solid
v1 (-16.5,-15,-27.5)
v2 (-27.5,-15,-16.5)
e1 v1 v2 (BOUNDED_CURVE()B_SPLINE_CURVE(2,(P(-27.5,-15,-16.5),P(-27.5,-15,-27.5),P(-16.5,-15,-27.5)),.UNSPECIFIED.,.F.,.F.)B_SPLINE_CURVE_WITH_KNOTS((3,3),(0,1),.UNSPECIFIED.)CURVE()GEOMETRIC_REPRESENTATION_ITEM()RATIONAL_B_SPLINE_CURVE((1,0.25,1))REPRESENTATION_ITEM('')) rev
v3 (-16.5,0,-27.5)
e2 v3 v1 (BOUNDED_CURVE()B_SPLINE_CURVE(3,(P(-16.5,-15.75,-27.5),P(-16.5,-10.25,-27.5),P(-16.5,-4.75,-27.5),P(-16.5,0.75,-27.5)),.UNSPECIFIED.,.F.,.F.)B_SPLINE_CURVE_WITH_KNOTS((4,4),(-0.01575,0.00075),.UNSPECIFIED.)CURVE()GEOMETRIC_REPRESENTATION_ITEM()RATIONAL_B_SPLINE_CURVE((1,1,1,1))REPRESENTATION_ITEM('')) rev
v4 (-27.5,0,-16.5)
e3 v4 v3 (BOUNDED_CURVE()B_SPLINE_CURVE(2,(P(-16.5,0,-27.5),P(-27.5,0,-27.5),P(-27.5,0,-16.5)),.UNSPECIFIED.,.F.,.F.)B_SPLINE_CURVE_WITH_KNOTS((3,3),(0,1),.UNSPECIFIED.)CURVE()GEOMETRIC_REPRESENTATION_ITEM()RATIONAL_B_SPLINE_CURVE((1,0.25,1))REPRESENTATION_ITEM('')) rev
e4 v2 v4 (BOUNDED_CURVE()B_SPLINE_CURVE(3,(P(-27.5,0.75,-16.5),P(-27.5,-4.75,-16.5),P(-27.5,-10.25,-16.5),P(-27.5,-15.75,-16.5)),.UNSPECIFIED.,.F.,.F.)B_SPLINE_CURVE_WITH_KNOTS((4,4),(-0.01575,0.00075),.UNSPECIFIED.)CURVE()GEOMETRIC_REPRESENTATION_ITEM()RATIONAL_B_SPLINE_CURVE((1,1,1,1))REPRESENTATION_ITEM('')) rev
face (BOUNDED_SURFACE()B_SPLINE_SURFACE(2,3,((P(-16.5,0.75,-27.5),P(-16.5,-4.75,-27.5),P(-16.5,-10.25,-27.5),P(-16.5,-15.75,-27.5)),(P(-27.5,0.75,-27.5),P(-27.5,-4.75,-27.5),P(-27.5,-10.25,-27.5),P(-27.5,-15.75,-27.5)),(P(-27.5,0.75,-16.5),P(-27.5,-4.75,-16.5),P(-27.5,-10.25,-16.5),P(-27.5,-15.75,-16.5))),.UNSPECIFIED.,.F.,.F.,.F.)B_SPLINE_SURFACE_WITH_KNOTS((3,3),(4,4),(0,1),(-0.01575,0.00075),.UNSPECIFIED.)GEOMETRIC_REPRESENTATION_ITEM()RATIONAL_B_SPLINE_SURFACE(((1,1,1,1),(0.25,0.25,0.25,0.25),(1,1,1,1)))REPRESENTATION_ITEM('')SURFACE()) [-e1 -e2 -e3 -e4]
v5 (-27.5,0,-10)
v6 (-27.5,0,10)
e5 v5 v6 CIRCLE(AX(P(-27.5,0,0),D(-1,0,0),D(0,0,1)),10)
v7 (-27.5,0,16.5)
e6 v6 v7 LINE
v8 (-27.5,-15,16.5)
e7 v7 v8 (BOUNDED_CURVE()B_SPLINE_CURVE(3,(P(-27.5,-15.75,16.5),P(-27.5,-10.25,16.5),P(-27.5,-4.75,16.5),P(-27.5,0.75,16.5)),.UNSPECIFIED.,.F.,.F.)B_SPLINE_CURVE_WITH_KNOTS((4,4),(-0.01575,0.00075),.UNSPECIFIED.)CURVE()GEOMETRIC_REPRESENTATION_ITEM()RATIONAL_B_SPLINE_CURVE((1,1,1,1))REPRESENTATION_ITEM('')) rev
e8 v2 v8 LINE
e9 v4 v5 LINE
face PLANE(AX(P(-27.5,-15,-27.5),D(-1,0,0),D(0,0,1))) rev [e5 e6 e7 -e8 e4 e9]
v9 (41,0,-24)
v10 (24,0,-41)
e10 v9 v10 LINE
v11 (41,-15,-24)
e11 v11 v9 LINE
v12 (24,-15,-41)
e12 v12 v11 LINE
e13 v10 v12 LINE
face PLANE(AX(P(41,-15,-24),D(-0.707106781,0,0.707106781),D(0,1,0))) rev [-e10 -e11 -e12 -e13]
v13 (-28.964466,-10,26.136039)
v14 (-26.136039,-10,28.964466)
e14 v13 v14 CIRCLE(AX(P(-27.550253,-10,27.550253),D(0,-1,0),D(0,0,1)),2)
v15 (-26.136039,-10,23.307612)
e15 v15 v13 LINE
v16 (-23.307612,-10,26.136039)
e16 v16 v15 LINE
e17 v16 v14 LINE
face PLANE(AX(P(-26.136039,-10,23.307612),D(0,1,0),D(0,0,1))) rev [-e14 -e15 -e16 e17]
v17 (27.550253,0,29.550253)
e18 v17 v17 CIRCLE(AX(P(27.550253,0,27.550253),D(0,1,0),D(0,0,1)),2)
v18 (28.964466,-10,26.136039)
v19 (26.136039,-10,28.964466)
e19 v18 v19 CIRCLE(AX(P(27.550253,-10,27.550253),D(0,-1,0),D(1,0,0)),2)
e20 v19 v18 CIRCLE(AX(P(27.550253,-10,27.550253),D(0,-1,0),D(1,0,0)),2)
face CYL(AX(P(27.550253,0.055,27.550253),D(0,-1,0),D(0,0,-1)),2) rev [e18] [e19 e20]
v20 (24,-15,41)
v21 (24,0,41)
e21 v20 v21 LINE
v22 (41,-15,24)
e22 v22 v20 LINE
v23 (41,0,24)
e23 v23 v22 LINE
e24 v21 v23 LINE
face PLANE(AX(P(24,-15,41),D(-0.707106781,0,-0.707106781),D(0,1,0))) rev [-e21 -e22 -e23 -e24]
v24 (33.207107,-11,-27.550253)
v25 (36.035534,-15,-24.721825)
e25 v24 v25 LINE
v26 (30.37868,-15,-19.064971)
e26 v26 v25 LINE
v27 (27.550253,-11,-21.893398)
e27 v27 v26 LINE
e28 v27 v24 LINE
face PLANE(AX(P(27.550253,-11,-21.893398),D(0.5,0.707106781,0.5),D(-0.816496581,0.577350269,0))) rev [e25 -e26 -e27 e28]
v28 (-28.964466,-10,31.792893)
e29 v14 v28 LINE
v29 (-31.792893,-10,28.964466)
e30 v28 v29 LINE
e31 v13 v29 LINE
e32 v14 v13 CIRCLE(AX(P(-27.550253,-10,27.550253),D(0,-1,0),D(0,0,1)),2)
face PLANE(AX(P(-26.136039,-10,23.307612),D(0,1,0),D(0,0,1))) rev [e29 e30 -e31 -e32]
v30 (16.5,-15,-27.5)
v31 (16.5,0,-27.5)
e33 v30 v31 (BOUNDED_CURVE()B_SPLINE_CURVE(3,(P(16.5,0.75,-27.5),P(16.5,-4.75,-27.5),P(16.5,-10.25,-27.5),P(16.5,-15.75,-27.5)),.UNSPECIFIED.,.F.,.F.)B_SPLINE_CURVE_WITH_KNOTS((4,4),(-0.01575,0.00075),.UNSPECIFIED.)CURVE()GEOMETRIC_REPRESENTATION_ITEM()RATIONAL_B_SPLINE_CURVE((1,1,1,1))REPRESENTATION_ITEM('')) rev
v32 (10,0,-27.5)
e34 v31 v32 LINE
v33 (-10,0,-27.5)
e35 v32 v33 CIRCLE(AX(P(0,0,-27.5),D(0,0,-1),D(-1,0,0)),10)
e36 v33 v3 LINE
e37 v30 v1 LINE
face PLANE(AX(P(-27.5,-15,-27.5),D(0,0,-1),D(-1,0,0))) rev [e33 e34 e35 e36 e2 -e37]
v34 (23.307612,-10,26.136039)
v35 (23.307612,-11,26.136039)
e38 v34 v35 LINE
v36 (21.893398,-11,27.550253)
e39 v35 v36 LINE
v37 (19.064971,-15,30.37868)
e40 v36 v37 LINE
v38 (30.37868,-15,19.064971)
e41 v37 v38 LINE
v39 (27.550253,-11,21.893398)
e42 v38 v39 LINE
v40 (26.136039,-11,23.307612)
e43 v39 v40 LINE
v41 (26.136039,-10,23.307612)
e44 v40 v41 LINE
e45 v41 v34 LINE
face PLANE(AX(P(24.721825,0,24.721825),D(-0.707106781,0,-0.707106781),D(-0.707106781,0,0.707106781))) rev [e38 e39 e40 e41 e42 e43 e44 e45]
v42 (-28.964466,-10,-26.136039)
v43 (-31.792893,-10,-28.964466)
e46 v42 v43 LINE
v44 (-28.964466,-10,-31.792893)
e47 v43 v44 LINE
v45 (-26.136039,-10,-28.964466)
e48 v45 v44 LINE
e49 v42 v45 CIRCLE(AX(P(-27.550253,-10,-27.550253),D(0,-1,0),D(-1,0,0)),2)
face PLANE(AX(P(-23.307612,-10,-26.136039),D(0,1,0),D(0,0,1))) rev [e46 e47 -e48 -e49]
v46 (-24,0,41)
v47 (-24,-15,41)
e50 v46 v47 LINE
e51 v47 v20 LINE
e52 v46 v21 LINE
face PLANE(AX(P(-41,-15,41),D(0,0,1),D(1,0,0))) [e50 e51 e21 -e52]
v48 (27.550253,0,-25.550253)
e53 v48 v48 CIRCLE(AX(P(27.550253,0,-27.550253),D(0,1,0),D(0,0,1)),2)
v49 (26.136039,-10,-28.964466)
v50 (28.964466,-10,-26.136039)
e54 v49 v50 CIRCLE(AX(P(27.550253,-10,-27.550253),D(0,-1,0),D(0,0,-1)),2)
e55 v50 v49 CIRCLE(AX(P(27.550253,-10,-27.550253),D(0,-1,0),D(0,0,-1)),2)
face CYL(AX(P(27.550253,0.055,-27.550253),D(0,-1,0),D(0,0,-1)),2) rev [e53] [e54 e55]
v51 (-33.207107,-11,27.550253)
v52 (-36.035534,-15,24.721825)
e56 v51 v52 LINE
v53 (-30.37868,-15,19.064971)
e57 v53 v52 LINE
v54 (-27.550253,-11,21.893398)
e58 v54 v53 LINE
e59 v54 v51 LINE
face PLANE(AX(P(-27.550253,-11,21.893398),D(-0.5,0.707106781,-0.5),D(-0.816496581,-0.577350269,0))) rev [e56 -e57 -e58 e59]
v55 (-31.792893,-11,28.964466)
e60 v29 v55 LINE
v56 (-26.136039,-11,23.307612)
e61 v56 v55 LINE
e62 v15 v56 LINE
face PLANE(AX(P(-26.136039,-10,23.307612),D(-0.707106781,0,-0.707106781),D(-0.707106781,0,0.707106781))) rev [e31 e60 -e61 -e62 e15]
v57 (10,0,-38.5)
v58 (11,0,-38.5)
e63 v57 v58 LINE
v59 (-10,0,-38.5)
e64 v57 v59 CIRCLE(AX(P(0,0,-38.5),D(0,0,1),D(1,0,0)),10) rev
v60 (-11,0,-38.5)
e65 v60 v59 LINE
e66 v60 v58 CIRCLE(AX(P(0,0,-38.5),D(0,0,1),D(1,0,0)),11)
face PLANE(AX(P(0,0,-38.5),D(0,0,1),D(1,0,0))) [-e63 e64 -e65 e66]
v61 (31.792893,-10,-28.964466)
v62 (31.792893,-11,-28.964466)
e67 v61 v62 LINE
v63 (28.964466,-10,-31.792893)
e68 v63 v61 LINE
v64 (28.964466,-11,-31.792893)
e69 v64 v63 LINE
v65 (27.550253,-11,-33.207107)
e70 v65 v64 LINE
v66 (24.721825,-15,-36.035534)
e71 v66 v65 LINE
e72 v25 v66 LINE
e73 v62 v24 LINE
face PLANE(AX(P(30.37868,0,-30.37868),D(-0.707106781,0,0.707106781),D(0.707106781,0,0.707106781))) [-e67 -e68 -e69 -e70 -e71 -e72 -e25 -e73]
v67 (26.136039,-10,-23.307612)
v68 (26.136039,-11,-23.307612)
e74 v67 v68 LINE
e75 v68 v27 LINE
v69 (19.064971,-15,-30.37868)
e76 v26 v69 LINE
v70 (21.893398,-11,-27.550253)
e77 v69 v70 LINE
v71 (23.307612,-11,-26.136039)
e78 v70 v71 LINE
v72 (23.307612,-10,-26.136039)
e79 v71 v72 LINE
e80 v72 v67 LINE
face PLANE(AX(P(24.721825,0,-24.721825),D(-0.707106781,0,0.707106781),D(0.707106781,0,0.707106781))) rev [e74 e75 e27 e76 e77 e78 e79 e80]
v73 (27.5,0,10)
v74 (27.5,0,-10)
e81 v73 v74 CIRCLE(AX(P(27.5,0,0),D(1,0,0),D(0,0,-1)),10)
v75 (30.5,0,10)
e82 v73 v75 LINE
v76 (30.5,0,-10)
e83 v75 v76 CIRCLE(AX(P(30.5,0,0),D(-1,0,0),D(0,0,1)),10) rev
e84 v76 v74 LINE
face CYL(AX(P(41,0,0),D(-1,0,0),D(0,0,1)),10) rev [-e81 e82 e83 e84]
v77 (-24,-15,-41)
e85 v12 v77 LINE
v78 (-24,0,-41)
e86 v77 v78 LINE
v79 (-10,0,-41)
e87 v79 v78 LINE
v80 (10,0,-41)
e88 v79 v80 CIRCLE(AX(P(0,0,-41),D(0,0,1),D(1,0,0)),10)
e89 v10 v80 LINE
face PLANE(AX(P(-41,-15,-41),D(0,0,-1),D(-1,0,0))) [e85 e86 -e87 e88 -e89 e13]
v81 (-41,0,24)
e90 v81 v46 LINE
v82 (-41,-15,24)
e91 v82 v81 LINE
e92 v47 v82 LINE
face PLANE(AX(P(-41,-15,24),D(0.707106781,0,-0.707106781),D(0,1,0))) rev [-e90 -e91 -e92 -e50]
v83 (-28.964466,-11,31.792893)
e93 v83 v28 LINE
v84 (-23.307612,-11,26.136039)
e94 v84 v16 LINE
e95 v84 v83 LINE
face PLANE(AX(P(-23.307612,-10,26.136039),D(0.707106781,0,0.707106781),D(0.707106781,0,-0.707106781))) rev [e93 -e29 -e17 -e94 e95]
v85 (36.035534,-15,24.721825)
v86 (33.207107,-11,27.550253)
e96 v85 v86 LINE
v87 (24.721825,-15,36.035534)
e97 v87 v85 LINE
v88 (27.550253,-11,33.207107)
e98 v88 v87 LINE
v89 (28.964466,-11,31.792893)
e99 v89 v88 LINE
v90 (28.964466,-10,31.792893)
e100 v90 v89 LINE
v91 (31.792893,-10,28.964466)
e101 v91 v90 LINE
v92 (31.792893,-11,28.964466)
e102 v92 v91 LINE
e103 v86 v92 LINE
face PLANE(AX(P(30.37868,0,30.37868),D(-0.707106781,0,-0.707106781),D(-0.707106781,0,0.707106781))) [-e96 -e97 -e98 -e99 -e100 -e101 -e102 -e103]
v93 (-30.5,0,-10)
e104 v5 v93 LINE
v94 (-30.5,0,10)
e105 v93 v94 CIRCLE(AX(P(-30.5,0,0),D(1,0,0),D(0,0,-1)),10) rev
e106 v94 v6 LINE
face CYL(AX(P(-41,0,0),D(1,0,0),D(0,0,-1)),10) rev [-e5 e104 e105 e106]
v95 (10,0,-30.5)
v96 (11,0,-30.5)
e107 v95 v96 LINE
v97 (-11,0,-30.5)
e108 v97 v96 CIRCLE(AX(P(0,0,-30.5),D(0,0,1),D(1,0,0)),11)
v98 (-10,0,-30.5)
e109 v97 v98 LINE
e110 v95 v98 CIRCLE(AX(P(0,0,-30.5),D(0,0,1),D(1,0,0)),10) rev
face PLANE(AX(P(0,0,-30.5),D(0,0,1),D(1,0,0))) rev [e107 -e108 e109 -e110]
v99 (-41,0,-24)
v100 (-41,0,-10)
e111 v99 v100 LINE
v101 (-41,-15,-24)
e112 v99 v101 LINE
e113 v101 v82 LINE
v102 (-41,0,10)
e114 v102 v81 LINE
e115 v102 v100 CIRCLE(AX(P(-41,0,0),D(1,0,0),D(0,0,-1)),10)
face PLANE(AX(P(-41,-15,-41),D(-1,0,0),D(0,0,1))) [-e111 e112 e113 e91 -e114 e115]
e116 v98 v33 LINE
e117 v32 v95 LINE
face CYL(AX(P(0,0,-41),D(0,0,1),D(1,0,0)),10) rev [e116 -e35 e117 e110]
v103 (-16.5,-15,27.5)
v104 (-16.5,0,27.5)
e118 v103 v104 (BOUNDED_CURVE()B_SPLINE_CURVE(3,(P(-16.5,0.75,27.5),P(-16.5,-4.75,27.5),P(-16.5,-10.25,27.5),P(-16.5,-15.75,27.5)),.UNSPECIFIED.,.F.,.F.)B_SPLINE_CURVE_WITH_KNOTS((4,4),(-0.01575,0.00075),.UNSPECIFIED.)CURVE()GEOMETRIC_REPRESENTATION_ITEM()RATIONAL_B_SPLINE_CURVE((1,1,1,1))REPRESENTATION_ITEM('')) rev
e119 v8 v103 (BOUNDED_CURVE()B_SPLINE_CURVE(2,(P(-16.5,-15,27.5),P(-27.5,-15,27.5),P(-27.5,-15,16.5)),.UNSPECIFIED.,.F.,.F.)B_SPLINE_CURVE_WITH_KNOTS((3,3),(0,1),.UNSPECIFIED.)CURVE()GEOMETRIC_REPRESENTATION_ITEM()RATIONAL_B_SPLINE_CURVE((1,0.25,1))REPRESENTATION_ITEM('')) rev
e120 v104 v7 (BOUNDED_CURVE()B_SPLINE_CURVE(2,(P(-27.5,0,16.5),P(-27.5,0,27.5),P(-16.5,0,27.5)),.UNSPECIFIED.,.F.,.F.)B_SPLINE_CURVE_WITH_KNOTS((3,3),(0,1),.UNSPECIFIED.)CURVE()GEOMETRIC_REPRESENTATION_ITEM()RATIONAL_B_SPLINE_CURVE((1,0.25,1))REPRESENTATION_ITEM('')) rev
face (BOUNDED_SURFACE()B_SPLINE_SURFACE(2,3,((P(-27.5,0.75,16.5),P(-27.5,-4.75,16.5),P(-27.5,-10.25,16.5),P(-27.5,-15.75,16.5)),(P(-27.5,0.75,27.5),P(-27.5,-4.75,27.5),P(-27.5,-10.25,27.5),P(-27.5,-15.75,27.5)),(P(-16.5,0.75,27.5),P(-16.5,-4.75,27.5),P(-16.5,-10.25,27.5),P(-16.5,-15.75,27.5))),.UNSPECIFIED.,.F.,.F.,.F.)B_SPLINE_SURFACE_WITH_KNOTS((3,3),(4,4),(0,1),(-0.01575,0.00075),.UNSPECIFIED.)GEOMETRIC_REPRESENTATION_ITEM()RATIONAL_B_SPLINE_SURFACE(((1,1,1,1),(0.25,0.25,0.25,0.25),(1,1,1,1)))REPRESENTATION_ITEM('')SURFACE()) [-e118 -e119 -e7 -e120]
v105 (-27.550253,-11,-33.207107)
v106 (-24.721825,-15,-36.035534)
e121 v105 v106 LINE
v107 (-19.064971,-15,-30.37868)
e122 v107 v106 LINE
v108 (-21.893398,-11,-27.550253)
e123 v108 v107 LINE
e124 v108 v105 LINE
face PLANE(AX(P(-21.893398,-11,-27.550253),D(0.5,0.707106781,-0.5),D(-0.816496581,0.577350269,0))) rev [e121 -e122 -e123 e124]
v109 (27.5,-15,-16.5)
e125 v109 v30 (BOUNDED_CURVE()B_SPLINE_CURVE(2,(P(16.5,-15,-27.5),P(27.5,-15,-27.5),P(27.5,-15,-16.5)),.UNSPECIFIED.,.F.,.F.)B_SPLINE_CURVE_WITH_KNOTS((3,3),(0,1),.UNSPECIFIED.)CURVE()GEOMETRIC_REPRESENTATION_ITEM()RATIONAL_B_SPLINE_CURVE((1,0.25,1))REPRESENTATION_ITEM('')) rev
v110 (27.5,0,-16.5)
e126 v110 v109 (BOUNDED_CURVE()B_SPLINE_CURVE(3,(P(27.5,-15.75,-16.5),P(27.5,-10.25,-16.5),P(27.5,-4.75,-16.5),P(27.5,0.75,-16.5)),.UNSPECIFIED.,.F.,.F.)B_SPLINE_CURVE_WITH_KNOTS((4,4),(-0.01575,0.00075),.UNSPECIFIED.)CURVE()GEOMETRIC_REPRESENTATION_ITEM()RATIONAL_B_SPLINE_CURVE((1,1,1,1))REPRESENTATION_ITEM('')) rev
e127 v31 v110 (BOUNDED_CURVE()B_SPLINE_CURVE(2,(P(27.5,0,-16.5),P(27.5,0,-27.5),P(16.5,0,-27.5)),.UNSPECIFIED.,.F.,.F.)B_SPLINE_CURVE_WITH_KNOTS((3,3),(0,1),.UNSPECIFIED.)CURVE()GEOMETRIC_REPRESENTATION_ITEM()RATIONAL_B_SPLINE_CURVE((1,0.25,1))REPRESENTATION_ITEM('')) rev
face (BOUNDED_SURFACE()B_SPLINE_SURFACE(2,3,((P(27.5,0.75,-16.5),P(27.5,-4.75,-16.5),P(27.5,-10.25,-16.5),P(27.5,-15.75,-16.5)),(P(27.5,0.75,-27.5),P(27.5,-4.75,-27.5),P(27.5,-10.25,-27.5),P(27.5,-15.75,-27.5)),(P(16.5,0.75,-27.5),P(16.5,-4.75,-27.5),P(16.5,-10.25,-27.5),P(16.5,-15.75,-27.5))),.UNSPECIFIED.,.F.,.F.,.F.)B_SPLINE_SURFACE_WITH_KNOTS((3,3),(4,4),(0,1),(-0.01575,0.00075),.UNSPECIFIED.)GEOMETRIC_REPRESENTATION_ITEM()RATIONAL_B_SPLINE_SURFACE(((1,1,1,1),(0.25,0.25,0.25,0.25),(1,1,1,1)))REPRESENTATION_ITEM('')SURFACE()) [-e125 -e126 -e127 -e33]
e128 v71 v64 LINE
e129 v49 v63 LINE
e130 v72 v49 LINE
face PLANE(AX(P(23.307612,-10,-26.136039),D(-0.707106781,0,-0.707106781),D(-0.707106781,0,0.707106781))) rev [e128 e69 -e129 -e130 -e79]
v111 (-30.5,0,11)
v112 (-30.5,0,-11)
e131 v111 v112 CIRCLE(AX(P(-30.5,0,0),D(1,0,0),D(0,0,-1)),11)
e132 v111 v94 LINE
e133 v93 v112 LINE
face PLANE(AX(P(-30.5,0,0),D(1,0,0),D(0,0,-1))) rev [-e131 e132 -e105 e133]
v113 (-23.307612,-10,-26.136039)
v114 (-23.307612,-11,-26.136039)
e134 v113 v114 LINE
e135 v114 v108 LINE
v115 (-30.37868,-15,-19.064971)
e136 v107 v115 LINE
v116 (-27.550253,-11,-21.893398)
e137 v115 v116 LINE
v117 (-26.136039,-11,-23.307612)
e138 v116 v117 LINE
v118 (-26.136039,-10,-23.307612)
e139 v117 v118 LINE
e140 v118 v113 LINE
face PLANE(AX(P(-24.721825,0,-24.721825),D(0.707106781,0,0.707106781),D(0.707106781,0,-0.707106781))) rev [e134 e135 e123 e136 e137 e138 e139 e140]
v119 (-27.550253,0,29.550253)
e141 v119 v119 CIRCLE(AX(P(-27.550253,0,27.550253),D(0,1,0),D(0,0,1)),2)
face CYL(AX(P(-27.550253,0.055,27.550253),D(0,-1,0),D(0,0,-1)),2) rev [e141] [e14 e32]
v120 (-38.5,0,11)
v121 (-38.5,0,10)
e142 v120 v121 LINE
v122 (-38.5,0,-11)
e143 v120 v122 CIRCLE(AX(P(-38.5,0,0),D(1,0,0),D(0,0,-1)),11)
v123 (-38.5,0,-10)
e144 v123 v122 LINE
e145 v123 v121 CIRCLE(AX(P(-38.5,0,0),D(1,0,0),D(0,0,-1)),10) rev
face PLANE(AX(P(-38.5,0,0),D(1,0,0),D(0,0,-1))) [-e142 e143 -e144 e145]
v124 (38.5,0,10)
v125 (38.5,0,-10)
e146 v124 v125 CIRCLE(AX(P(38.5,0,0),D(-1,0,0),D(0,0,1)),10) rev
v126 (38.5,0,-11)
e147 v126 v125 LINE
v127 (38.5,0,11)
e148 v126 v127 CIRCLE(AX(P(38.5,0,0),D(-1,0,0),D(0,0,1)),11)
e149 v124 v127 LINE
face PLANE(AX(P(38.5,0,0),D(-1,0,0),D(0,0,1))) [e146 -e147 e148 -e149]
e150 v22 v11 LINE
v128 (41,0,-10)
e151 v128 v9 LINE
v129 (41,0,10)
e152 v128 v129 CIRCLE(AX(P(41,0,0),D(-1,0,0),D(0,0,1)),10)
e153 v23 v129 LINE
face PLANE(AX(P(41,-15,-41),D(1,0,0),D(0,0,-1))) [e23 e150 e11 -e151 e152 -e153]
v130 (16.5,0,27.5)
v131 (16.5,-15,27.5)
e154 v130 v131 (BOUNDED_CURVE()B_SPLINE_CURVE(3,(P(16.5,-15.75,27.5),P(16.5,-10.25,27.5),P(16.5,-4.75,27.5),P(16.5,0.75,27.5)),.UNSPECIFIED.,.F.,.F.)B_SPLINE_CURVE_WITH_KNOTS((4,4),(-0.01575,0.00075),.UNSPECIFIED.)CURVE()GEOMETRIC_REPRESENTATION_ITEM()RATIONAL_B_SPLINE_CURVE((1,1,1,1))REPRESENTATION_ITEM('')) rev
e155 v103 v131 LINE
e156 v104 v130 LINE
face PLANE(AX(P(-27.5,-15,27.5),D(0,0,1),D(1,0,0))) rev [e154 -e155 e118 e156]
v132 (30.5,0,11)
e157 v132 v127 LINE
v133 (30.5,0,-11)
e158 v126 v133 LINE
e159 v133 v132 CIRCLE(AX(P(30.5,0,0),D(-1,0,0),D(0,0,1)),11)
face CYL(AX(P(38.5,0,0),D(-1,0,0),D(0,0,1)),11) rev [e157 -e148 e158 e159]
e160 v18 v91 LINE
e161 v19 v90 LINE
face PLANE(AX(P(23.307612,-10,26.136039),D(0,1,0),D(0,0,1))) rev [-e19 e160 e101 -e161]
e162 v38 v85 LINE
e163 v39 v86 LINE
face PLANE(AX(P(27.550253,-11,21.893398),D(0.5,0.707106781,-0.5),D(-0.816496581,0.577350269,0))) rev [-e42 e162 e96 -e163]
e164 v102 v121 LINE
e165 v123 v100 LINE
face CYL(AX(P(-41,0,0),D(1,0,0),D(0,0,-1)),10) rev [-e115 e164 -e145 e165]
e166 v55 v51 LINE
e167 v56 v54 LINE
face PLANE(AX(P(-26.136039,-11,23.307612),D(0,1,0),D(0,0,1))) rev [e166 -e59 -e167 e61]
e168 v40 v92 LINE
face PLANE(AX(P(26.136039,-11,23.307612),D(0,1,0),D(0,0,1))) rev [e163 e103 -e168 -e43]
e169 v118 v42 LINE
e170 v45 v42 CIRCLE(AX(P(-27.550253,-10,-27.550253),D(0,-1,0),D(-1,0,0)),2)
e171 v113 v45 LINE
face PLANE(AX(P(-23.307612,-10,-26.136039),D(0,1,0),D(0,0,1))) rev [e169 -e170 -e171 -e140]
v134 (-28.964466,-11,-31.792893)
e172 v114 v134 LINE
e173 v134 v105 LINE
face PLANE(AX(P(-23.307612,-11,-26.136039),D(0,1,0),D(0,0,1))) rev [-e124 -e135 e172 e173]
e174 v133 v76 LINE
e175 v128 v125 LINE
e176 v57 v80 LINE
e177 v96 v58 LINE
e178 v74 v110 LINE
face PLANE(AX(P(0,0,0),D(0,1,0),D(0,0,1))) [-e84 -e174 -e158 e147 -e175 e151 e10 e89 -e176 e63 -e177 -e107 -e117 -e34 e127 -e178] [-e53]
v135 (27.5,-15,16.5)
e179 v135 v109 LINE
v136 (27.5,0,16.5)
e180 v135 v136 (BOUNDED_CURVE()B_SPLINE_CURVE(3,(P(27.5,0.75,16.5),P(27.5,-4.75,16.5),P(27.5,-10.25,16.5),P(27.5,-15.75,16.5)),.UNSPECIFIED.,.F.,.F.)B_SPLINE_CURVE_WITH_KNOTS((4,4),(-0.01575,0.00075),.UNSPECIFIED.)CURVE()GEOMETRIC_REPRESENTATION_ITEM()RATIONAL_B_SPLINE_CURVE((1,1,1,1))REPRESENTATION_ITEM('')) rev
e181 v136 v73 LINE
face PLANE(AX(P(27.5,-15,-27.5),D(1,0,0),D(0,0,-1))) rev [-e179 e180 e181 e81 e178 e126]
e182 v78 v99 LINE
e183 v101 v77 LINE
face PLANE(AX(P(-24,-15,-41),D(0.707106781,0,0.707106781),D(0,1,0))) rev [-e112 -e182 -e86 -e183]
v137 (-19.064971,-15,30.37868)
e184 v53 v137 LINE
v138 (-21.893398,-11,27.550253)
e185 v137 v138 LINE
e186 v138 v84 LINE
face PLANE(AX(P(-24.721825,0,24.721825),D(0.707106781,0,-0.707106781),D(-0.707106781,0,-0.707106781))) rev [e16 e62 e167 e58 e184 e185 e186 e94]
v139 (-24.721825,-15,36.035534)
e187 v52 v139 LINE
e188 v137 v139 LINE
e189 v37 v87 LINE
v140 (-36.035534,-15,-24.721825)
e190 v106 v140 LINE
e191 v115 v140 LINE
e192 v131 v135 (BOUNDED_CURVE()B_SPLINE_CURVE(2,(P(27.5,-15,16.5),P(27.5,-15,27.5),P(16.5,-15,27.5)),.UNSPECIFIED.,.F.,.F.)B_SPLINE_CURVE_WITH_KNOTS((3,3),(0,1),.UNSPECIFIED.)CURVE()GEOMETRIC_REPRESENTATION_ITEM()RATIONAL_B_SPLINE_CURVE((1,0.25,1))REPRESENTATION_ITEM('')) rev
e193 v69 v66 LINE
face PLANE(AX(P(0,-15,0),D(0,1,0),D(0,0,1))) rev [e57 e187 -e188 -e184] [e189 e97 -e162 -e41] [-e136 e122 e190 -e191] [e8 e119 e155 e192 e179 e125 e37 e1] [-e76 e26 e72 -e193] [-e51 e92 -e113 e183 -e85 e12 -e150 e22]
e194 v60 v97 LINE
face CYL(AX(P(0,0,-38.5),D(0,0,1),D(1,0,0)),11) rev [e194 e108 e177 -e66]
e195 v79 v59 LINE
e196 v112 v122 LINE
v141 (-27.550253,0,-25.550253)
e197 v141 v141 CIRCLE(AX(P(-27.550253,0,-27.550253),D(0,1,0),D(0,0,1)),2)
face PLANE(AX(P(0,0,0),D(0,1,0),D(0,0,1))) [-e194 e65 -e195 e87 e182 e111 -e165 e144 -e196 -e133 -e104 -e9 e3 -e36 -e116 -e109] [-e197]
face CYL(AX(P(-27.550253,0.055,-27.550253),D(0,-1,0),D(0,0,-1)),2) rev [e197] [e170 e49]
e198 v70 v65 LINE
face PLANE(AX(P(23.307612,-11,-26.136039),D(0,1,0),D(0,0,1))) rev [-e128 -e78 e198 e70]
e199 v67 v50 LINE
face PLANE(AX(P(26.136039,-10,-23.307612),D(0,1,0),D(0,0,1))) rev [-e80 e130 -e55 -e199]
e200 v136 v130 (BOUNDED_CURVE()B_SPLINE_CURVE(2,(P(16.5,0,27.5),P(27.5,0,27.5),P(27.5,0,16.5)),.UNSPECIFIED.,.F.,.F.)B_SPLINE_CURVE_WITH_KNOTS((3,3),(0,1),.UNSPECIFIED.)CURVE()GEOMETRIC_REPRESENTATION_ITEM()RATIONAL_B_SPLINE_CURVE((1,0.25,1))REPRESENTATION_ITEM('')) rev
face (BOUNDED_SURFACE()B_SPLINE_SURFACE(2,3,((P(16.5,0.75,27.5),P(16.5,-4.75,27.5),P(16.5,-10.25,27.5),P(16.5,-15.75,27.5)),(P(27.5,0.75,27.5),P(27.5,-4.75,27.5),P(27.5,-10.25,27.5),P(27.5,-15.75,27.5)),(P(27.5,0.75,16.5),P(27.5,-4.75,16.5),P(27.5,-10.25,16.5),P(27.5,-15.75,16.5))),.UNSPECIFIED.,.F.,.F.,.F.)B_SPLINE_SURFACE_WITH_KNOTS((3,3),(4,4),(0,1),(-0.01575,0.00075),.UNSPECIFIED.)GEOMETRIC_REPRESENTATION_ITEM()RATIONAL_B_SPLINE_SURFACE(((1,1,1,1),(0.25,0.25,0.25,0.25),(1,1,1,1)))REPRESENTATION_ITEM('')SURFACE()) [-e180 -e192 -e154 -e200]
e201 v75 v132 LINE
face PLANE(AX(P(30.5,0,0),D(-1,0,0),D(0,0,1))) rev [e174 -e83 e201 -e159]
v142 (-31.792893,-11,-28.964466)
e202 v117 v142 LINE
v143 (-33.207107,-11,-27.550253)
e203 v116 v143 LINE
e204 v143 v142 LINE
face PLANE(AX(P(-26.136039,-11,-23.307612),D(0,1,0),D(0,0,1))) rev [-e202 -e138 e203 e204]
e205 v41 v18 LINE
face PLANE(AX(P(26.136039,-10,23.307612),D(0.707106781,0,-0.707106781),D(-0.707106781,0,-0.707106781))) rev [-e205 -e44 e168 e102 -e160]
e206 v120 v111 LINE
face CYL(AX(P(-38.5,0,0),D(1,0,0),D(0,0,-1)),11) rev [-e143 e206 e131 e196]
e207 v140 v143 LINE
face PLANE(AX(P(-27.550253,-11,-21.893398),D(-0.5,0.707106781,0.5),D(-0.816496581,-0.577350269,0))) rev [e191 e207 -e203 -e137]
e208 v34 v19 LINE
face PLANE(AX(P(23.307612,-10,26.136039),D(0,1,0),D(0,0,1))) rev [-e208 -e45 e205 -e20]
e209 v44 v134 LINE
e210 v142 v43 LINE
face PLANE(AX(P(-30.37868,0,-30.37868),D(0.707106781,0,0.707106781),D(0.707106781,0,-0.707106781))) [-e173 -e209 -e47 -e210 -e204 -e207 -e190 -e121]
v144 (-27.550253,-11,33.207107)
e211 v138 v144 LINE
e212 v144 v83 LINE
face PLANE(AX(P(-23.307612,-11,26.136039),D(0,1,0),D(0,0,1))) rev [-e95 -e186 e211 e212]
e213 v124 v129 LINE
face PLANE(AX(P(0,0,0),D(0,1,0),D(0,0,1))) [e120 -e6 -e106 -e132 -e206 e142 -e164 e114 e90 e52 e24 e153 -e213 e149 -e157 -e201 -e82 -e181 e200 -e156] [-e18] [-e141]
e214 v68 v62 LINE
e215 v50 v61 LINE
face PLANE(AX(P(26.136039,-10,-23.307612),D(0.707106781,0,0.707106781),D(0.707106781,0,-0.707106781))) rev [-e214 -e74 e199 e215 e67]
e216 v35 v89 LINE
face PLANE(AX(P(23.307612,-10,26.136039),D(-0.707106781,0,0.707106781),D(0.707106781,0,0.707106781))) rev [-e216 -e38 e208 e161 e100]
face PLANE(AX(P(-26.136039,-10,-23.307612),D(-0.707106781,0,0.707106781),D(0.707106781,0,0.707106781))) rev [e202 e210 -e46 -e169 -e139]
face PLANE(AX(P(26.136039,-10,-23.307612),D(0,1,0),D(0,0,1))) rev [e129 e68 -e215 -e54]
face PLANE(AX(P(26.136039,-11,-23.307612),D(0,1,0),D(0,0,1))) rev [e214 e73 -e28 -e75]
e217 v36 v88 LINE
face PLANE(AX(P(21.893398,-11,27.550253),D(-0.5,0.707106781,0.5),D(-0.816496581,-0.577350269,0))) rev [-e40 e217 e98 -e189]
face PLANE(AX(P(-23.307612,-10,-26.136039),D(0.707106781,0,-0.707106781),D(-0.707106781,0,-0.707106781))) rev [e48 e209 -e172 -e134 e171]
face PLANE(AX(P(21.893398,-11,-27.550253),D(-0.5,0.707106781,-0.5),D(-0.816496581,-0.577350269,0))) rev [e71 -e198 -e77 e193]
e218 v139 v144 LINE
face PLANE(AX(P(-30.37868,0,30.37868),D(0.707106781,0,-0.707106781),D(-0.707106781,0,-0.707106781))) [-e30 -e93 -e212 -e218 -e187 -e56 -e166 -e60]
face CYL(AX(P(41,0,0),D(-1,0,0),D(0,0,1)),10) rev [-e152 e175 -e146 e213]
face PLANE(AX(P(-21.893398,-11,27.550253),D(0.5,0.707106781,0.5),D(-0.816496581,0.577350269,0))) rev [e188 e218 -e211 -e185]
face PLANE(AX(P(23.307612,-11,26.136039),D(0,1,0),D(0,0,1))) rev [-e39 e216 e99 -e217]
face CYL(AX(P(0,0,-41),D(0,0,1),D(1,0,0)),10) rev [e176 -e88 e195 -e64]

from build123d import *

# Parameters (mm, degrees)
SKETCH1_W           = 82
SKETCH1_H           = 82
SKETCH1_W_2         = 55
SKETCH1_H_2         = 55
BOSS_EXTRUDE1_DEPTH = 15
SKETCH2_R           = 10
CUT_EXTRUDE1_DEPTH  = 60.891568689
CUT_EXTRUDE2_START  = -30.5
SKETCH3_R           = 11
CUT_EXTRUDE2_DEPTH  = 8
CIRPATTERN3_COUNT   = 3
CIRPATTERN3_ANGLE   = 180
FILLET1_SIZE        = 11
CHAMFER1_SIZE       = 17
CUT_EXTRUDE3_START  = -7
CUT_EXTRUDE3_DEPTH  = 4
SKETCH5_R           = 2
CUT_EXTRUDE4_DEPTH  = 59.83876289
CIRPATTERN4_COUNT   = 4


with BuildPart() as part:
    # Sketch1 → Boss-Extrude1 (new body)
    with BuildSketch(Plane(origin=(0, 0, 0), x_dir=(1, 0, 0), z_dir=(0, 1, 0))):
        Rectangle(SKETCH1_W, SKETCH1_H)
        Rectangle(SKETCH1_W_2, SKETCH1_H_2, mode=Mode.SUBTRACT)
    extrude(amount=-BOSS_EXTRUDE1_DEPTH)

    # Sketch2 → Cut-Extrude1 (cut, through all)
    with BuildSketch(Plane(origin=(0, 0, 0), x_dir=(0, 0, -1), z_dir=(1, 0, 0))):
        Circle(SKETCH2_R)
    cut_extrude1 = extrude(amount=-CUT_EXTRUDE1_DEPTH, mode=Mode.SUBTRACT)

    # Sketch3 → Cut-Extrude2 (cut)
    with BuildSketch(Plane(origin=(0, 0, 0), x_dir=(0, 0, -1), z_dir=(1, 0, 0)).offset(CUT_EXTRUDE2_START)):
        Circle(SKETCH3_R)
    cut_extrude2 = extrude(amount=-CUT_EXTRUDE2_DEPTH, mode=Mode.SUBTRACT)

    # CirPattern3: Cut-Extrude1, Cut-Extrude2 ×3 about axis
    cirpattern3_axis = Axis((0, 0, 0), (0, -1, 0))
    add([cut_extrude1.rotate(cirpattern3_axis, i * CIRPATTERN3_ANGLE / (CIRPATTERN3_COUNT - 1)) for i in range(1, CIRPATTERN3_COUNT)], mode=Mode.SUBTRACT)
    add([cut_extrude2.rotate(cirpattern3_axis, i * CIRPATTERN3_ANGLE / (CIRPATTERN3_COUNT - 1)) for i in range(1, CIRPATTERN3_COUNT)], mode=Mode.SUBTRACT)

    # Fillet1
    # a fillet whose section is not a circle: 11 mm, written as the material it adds along each edge
    with BuildSketch(Plane(origin=(-27.5, 0, 27.5), x_dir=(0, 0, -1), z_dir=(0, -1, 0))) as fillet1_piece_1:
        with BuildLine():
            Bezier((FILLET1_SIZE, 0), (0, 0), (0, FILLET1_SIZE), weights=[1, 0.25, 1])
            Line((0, FILLET1_SIZE), (0, 0))
            Line((0, 0), (FILLET1_SIZE, 0))
        make_face()
    extrude(amount=15)
    with BuildSketch(Plane(origin=(-27.5, 0, -27.5), x_dir=(0, 0, 1), z_dir=(0, -1, 0)), Plane(origin=(27.5, 0, 27.5), x_dir=(0, 0, -1), z_dir=(0, -1, 0)), Plane(origin=(27.5, 0, -27.5), x_dir=(-1, 0, 0), z_dir=(0, -1, 0))) as fillet1_piece_2:
        with BuildLine():
            Bezier((FILLET1_SIZE, 0), (0, 0), (0, -FILLET1_SIZE), weights=[1, 0.25, 1])
            Line((0, -FILLET1_SIZE), (0, 0))
            Line((0, 0), (FILLET1_SIZE, 0))
        make_face()
    extrude(amount=15)

    # Chamfer1
    chamfer1_edges = [part.edges().sort_by_distance(p)[0] for p in [
        (41, -7.5, 41),
        (-41, -7.5, 41),
        (-41, -7.5, -41),
        (41, -7.5, -41),
    ]]
    chamfer(chamfer1_edges, length=CHAMFER1_SIZE)

    # Sketch4 → Cut-Extrude3 (cut, symmetric)
    with BuildSketch(Plane(origin=(32.5, 0, -32.5), x_dir=(-0.7071067811865488, 0, -0.7071067811865464), z_dir=(0.7071067811865464, 0, -0.7071067811865488)).offset(CUT_EXTRUDE3_START)):
        Polygon((-2, -10), (2, -10), (2, -11), (4, -11), (8, -15), (-8, -15), (-4, -11), (-2, -11), align=None)
    cut_extrude3 = extrude(amount=CUT_EXTRUDE3_DEPTH, both=True, mode=Mode.SUBTRACT)

    # Sketch5 → Cut-Extrude4 (cut, through all)
    with BuildSketch(Plane.XZ.offset(10)):
        with Locations(Location((27.550252532, -27.550252532, 0), (0, 0, 225))):
            Circle(SKETCH5_R)
    cut_extrude4 = extrude(amount=-CUT_EXTRUDE4_DEPTH, mode=Mode.SUBTRACT)

    # CirPattern4: Cut-Extrude3, Cut-Extrude4 ×4 about axis
    cirpattern4_axis = Axis((0, 0, 0), (0, 1, 0))
    add([cut_extrude3.rotate(cirpattern4_axis, i * 360 / CIRPATTERN4_COUNT) for i in range(1, CIRPATTERN4_COUNT)], mode=Mode.SUBTRACT)
    add([cut_extrude4.rotate(cirpattern4_axis, i * 360 / CIRPATTERN4_COUNT) for i in range(1, CIRPATTERN4_COUNT)], mode=Mode.SUBTRACT)


solid = part.part
